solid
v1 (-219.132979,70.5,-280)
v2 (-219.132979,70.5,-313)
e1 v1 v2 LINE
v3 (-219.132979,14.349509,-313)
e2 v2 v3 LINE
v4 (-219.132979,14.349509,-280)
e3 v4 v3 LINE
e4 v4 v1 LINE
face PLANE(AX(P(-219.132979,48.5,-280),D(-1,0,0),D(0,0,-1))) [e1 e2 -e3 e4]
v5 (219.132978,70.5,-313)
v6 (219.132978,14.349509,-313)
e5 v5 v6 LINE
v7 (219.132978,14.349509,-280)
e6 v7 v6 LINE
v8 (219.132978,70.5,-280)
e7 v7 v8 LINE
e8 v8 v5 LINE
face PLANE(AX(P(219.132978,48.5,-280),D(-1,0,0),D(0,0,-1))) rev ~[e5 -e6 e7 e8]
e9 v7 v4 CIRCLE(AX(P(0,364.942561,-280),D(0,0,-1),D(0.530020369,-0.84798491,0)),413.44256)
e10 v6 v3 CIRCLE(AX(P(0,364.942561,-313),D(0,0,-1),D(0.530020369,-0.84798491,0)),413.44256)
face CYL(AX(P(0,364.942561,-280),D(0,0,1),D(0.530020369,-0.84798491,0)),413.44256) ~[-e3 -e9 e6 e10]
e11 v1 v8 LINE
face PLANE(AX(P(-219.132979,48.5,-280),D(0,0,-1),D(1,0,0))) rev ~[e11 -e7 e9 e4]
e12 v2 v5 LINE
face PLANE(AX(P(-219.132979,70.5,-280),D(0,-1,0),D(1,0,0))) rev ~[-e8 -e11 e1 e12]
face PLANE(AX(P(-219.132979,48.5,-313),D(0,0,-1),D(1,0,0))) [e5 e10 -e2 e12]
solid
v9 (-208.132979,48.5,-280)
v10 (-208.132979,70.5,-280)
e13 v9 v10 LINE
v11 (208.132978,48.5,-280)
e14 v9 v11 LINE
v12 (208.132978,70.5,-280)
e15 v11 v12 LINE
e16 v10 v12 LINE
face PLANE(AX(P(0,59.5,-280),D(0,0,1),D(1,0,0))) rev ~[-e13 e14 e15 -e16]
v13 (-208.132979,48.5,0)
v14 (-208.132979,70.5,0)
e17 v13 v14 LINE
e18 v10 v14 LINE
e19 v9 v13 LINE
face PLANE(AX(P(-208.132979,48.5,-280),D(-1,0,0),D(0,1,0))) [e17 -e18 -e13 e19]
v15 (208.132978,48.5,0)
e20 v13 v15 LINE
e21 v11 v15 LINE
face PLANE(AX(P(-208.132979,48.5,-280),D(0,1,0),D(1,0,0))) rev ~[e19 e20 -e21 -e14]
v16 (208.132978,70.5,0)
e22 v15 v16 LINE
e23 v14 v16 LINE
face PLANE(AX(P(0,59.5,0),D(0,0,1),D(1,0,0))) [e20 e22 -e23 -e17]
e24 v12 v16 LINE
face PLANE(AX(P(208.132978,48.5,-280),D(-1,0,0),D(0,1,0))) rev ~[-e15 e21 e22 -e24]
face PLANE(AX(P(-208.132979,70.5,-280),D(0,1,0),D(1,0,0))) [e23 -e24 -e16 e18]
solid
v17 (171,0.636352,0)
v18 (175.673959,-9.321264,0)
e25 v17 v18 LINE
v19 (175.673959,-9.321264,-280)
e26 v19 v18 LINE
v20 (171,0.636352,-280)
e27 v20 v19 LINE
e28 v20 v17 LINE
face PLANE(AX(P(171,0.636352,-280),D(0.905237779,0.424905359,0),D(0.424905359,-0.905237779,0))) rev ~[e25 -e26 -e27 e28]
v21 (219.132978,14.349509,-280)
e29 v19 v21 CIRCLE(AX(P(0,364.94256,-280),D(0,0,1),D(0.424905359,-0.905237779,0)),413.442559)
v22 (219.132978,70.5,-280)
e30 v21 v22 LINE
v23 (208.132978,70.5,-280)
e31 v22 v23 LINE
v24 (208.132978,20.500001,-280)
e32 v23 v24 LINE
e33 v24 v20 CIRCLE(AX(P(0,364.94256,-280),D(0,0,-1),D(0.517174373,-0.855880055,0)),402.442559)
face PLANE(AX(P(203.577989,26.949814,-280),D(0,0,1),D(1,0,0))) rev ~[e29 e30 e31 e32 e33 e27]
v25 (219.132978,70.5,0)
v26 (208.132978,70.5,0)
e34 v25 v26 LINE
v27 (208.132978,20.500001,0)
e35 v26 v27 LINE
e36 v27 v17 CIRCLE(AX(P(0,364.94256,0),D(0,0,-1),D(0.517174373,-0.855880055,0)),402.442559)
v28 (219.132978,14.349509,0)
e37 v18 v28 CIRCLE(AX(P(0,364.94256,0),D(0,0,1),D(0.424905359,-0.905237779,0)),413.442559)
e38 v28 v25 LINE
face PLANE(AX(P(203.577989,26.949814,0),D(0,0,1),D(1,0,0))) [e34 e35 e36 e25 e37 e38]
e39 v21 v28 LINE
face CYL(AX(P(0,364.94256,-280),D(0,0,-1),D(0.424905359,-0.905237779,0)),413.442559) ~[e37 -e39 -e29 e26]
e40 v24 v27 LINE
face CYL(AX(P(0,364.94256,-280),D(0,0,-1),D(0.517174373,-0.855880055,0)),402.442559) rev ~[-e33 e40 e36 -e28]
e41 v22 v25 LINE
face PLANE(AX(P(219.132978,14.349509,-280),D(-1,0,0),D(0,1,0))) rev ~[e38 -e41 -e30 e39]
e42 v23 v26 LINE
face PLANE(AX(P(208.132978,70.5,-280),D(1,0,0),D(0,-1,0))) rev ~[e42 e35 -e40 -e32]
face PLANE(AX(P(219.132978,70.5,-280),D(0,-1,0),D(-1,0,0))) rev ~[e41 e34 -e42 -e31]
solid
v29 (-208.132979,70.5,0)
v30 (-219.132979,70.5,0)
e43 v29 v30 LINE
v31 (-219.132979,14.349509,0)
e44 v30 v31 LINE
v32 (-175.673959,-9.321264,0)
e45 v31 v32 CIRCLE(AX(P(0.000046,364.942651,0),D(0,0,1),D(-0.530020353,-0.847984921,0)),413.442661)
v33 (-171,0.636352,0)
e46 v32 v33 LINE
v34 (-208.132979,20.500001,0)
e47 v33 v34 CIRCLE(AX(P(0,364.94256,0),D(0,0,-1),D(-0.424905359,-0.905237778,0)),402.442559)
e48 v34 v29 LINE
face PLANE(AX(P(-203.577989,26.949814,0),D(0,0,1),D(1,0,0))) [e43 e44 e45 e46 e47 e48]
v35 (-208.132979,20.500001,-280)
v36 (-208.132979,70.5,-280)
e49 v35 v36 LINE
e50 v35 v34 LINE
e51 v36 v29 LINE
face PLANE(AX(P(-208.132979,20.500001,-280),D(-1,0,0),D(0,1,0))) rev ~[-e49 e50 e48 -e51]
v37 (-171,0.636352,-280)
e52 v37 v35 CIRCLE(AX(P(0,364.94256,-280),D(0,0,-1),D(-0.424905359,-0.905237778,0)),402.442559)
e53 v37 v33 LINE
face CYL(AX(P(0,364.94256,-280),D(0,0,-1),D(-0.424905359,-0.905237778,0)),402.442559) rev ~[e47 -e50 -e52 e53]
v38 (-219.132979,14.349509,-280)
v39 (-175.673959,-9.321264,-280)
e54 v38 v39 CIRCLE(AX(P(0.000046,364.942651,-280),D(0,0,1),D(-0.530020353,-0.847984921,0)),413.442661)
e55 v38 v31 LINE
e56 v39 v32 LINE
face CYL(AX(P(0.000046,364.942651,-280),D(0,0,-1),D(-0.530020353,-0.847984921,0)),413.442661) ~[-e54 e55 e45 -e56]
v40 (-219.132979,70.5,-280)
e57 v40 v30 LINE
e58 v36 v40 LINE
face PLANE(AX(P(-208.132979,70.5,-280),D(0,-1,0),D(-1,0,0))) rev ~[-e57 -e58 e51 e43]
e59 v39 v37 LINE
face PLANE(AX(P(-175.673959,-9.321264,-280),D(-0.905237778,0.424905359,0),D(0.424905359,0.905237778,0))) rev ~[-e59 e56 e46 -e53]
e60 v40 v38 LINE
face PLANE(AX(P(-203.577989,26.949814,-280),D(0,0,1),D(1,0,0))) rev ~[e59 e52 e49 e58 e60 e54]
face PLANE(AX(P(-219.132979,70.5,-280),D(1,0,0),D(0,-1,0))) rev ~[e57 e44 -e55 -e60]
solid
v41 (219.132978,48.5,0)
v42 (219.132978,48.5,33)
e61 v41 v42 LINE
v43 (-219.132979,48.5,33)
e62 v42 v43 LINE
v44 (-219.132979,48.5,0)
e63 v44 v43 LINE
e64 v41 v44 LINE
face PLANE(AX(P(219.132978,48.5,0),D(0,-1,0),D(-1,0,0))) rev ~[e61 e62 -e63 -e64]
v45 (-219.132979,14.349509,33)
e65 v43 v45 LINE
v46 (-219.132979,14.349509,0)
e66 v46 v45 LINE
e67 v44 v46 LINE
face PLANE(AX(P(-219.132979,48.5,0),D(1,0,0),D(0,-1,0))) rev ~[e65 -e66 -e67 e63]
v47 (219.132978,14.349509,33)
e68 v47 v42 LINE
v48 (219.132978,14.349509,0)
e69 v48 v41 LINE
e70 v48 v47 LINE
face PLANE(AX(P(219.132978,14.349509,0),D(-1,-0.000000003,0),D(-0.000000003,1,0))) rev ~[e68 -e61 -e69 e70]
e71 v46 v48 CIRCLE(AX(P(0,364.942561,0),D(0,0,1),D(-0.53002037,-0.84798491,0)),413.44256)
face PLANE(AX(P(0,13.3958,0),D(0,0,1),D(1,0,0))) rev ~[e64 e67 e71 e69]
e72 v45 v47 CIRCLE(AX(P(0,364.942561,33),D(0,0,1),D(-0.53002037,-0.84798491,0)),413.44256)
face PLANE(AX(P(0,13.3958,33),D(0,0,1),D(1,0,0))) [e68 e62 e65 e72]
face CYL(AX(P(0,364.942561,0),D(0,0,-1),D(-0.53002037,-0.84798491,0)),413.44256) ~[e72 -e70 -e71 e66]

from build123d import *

# Parameters (mm, degrees)
F1_DEPTH = 33
F4_DEPTH = 33
F5_DEPTH = 22
F7_DEPTH = 280
F8_W     = 416.265957
F8_H     = 22
F9_DEPTH = 280


# Not quite as in the source:
# - ends of sketch curves that miss each other by under 0.0002 mm in the source are joined


with BuildPart() as f1:
    # F0 (on Top) → F1 (new body)
    with BuildSketch(Plane.XY):
        with BuildLine():
            Line((219.132978, 48.5), (-219.132979, 48.5))
            Line((-219.132979, 48.5), (-219.132979, 14.349509))
            ThreePointArc((-219.132979, 14.349509), (-4.24e-07, -48.499999), (219.1329780871, 14.3495088607))
            Line((219.1329780871, 14.3495088607), (219.132978, 48.5))
        make_face()
    extrude(amount=F1_DEPTH)


with BuildPart() as f4:
    # F3 (on offset) → F4 (new body)
    with BuildSketch(Plane(origin=(0, 0, -280), x_dir=(1, 0, 0), z_dir=(0, 0, -1))):
        with BuildLine():
            Line((-219.132979, -14.349509), (-219.132979, -48.5))
            Line((-219.132979, -48.5), (219.132978, -48.5))
            Line((219.132978, -48.5), (219.132978, -14.3495088607))
            ThreePointArc((219.132978, -14.3495088607), (-4.24e-07, 48.499999), (-219.132979, -14.349509))
        make_face()
    extrude(amount=F4_DEPTH)

    # F5 (add): a face of the model
    f5_faces = [f4.faces().sort_by_distance(p)[0] for p in [
        (-5e-07, 48.5, -296.5),
    ]]
    extrude(f5_faces, amount=F5_DEPTH)


with BuildPart() as f7:
    # F6 (on face) → F7 (new body)
    with BuildSketch(Plane.XY.offset(-280)):
        with BuildLine():
            ThreePointArc((175.6739587965, -9.3212637837), (197.7579472725, 1.8633071047), (219.1329780245, 14.3495088216))
            Line((219.132978, 14.3495088607), (219.132978, 70.5))
            Line((219.132978, 70.5), (208.132978, 70.5))
            Line((208.132978, 70.5), (208.132978, 20.5000005459))
            ThreePointArc((208.132978, 20.5000005459), (189.82648619, 10.0821389395), (170.9999998518, 0.6363517834))
            Line((170.9999998518, 0.6363517834), (175.6739587965, -9.3212637837))
        make_face()
    extrude(amount=F7_DEPTH)


with BuildPart() as f7b:
    # F6 (on face) → F7, piece 2 (new body)
    with BuildSketch(Plane.XY.offset(-280)):
        with BuildLine():
            Line((-208.132979, 70.5), (-219.132979, 70.5))
            Line((-219.132979, 70.5), (-219.132979, 14.349509))
            ThreePointArc((-219.132979, 14.349509), (-197.7579478249, 1.8633074056), (-175.673959101, -9.3212636408))
            Line((-175.673959101, -9.3212636408), (-171.0000001482, 0.6363519225))
            ThreePointArc((-171.0000001482, 0.6363519225), (-189.8264868494, 10.0821392923), (-208.132979, 20.5000011501))
            Line((-208.132979, 20.5000011501), (-208.132979, 70.5))
        make_face()
    extrude(amount=F7_DEPTH)


with BuildPart() as f9:
    # F8 (on face) → F9 (new body)
    with BuildSketch(Plane.XY.offset(-280)):
        with Locations((-5e-07, 59.5)):
            Rectangle(F8_W, F8_H)
    extrude(amount=F9_DEPTH)


solid = Compound([f1.part, f4.part, f7.part, f7b.part, f9.part])
